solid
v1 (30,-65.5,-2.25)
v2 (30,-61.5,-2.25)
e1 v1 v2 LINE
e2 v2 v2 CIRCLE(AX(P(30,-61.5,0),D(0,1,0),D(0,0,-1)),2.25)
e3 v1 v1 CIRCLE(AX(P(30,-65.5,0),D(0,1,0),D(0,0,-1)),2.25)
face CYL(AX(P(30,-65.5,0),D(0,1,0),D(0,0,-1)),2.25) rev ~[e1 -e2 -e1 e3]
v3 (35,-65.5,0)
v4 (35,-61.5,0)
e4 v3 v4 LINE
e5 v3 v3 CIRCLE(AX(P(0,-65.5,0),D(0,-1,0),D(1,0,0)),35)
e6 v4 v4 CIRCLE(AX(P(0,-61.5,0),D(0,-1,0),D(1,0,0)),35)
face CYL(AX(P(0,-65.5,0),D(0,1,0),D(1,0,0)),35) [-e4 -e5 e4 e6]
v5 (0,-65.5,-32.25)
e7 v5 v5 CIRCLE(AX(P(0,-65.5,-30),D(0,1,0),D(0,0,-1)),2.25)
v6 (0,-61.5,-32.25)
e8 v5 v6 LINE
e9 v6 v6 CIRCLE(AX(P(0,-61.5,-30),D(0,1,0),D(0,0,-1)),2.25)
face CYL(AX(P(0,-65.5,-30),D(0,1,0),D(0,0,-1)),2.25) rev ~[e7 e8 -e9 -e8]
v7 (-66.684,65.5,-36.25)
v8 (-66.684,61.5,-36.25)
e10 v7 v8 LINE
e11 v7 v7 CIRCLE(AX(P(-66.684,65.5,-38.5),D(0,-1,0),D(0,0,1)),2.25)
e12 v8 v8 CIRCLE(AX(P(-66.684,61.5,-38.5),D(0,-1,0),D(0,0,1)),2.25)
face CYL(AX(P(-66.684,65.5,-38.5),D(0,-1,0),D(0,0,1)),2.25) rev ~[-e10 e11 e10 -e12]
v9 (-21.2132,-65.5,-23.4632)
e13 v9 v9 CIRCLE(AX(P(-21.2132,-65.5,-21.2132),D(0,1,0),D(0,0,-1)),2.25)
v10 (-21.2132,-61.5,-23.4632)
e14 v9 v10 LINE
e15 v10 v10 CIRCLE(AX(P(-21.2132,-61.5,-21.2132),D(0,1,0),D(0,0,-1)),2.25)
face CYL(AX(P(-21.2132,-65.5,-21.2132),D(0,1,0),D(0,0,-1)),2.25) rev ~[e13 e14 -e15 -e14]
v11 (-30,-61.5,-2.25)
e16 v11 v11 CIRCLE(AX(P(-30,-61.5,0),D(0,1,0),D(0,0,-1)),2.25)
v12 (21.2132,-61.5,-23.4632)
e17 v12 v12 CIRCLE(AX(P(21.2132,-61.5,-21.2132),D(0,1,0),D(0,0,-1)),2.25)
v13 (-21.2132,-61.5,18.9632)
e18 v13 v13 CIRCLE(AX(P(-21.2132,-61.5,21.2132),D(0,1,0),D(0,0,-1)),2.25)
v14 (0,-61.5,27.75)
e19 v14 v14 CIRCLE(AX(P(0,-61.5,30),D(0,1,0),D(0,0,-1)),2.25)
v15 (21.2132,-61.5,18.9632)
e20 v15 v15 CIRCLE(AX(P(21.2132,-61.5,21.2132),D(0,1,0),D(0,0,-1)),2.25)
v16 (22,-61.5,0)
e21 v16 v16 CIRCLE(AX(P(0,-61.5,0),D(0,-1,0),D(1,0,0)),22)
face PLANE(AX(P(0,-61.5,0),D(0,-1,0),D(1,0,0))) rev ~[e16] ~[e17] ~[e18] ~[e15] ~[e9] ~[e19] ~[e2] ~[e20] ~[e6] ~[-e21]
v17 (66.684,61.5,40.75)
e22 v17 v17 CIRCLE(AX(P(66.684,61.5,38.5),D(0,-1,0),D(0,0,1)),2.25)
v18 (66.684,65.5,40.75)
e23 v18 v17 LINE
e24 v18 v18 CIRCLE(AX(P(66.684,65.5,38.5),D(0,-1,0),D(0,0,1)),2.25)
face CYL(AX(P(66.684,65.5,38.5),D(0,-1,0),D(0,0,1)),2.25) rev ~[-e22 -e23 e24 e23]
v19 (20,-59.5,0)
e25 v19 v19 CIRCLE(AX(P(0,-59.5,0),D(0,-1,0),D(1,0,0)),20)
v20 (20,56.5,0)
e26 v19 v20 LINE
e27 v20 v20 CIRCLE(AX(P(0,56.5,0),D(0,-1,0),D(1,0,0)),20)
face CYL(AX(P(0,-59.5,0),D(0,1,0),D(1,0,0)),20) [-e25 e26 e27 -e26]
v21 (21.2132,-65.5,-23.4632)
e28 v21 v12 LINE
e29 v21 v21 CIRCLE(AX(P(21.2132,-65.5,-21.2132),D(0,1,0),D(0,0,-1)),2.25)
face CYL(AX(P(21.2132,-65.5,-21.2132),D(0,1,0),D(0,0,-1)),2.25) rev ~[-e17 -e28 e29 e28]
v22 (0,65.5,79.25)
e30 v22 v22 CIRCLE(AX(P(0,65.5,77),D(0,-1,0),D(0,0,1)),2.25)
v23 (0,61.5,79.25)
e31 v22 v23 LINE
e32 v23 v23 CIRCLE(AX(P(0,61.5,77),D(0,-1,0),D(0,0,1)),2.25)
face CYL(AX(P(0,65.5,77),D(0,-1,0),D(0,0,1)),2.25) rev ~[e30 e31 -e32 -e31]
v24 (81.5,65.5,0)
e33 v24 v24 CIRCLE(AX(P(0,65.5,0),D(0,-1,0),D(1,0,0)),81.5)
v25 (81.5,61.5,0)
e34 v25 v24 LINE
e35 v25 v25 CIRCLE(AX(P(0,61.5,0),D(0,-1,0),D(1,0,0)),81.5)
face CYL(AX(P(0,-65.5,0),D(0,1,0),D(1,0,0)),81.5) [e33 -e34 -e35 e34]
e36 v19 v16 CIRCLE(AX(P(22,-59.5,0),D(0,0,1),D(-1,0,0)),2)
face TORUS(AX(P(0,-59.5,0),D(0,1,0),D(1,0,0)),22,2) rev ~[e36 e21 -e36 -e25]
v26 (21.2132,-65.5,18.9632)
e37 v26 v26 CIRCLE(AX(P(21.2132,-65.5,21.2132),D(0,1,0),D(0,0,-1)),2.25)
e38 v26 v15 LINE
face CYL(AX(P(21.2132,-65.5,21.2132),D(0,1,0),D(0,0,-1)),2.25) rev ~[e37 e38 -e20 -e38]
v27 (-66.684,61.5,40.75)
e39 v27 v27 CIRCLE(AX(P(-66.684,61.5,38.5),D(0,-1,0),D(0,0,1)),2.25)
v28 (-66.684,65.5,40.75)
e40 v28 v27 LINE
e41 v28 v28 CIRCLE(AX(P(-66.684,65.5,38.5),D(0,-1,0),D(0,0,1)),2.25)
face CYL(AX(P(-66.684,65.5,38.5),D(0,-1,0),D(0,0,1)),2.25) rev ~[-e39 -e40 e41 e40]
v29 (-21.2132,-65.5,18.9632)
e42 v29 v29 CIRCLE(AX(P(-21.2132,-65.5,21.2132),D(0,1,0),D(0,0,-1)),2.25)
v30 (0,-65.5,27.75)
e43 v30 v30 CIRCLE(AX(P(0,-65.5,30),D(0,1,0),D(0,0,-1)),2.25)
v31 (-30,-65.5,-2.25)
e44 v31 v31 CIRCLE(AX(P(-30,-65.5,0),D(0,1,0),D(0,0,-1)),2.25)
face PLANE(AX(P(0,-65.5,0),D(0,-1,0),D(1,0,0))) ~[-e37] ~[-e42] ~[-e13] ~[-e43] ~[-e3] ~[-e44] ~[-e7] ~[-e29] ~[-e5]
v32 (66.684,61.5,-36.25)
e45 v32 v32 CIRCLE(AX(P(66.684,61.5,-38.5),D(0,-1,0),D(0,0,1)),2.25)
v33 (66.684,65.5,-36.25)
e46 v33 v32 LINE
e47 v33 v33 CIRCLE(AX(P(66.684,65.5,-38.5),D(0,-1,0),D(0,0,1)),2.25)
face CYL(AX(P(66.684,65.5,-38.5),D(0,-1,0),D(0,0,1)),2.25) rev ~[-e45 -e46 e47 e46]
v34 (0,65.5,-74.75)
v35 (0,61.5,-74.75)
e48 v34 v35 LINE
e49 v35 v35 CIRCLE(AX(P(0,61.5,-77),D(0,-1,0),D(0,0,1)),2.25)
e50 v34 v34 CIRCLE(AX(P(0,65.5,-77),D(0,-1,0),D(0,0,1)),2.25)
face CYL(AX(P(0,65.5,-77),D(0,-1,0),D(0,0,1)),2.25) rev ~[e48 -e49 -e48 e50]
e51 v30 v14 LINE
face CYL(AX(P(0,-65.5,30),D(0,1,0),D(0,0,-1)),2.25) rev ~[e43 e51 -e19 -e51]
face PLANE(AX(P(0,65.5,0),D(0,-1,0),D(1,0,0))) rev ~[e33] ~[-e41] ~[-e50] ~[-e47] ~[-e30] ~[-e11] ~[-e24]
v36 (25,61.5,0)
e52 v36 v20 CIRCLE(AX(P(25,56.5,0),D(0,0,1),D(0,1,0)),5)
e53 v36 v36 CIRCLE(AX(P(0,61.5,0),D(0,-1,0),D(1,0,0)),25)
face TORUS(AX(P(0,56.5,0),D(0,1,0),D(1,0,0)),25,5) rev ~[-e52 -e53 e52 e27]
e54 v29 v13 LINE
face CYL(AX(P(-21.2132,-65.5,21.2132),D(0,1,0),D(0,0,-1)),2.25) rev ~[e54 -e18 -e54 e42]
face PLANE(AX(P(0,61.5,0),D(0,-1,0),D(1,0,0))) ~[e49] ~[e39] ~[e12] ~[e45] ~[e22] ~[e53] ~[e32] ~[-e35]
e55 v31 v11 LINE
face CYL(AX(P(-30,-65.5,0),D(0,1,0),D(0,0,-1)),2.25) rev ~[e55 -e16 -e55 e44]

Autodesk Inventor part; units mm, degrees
ref_plane "YZ Plane" through (0, 0, 0) normal (1, 0, 0) x (0, 1, 0)
ref_plane "XZ Plane" through (0, 0, 0) normal (0, 1, 0) x (-1, 0, 0)
ref_plane "XY Plane" through (0, 0, 0) normal (0, 0, 1) x (1, 0, 0)
sketch "Sketch1" plane through (0, 0, 0) normal (0, 0, 1) x (1, 0, 0)
  line L0 (0, 91.7) -> (0, -91.7) construction
  line L1 (-16.3, 0) -> (97.8, 0) construction
  line L2 (0, -65.5) -> (0, 65.5)
  line L3 (0, -65.5) -> (81.5, -65.5)
  line L4 (81.5, -65.5) -> (81.5, 65.5)
  line L5 (81.5, 65.5) -> (0, 65.5)
  point P0 (0, 0)
  dimension "d2" = 131
  dimension "d12" = 81.5
revolve "Revolution1" add sketch "Sketch1" angle 360 about axis through (0, 0, 0) along (0, -1, 0)
sketch "Sketch4" plane through (0, 0, 0) normal (0, 0, 1) x (1, 0, 0)
  line L0 (-81.5, 65.5) -> (81.5, 65.5) construction
  line L1 (-81.5, -65.5) -> (81.5, -65.5) construction
  line L2 (0, 91) -> (0, -91) construction
  line L3 (-114.1, 0) -> (114.1, 0) construction
  line L4 (35, -61.5) -> (22, -61.5)
  line L5 (20, -59.5) -> (20, 56.5)
  line L6 (25, 61.5) -> (81.5, 61.5)
  line L7 (81.5, 65.5) -> (81.5, -65.5) construction
  line L8 (81.5, -65.5) -> (81.5, 61.5)
  arc A0 (20, -59.5) -> (22, -61.5) centre (22, -59.5) ccw
  arc A1 (25, 61.5) -> (20, 56.5) centre (25, 56.5) ccw
  line L9 (35, -65.5) -> (35, -61.5)
  line L10 (-81.5, -65.5) -> (81.5, -65.5) construction
  line L11 (35, -65.5) -> (81.5, -65.5)
  point P0 (0, 0)
  dimension "d35" = 20
  dimension "d36" = 4
  dimension "d37" = 2
  dimension "d39" = 35
  dimension "d40" = 5
revolve "Revolution2" cut sketch "Sketch4" angle 360 about axis through (0, 0, 0) along (0, -1, 0)
sketch "Sketch2" plane through (0, -65.5, 0) normal (0, -1, 0) x (1, 0, 0)
  circle A0 centre (0, 0) radius 81.5 construction
  line L0 (-114.1, 0) -> (114.1, 0) construction
  line L1 (0, 114.1) -> (0, -114.1) construction
  circle A1 centre (0, 0) radius 21.25 construction
  circle A2 centre (0, 0) radius 30 construction
  point P0 (0, 30)
  point P1 (0, 21.25)
  point P2 (-21.2132, 21.2132)
  point P3 (-15.026, 15.026)
  point P4 (-30, 0)
  point P5 (-21.25, 0)
  point P6 (-21.2132, -21.2132)
  point P7 (-15.026, -15.026)
  point P8 (0, -30)
  point P9 (0, -21.25)
  point P10 (21.2132, -21.2132)
  point P11 (15.026, -15.026)
  point P12 (30, 0)
  point P13 (21.25, 0)
  point P14 (21.2132, 21.2132)
  point P15 (15.026, 15.026)
  point P16 (-4.5183, 21.1087)
  dimension "d6" = 42.5
  dimension "d7" = 60
  dimension "d10" = 360
hole "Hole2" at (0, -65.5, 30) at (-21.2132, -65.5, 21.2132) at (-30, -65.5, 0) at (-21.2132, -65.5, -21.2132) at (0, -65.5, -30) at (21.2132, -65.5, -21.2132) at (30, -65.5, 0) at (21.2132, -65.5, 21.2132) direction (0, 1, 0) diameter 4.5 depth 4 clearance for "Socket Head Cap Screw" size "M4" standard "Ansi Metric M Profile"
sketch "Sketch5" plane through (0, 65.5, 0) normal (0, 1, 0) x (1, 0, 0)
  line L0 (0, 114.1) -> (0, -114.1) construction
  line L1 (114.1, 0) -> (-114.1, 0) construction
  circle A0 centre (0, 0) radius 77 construction
  point P0 (0, 77)
  point P1 (-66.684, 38.5)
  point P2 (-66.684, -38.5)
  point P3 (0, -77)
  point P4 (66.684, -38.5)
  point P5 (66.684, 38.5)
  dimension "d45" = 154
  dimension "d43" = 360
hole "Hole3" at (0, 65.5, -77) at (-66.684, 65.5, -38.5) at (-66.684, 65.5, 38.5) at (0, 65.5, 77) at (66.684, 65.5, 38.5) at (66.684, 65.5, -38.5) direction (0, -1, 0) diameter 4.5 depth 4 clearance for "Socket Head Cap Screw" size "M4" standard "Ansi Metric M Profile"
properties part number "Connection_link_1"
